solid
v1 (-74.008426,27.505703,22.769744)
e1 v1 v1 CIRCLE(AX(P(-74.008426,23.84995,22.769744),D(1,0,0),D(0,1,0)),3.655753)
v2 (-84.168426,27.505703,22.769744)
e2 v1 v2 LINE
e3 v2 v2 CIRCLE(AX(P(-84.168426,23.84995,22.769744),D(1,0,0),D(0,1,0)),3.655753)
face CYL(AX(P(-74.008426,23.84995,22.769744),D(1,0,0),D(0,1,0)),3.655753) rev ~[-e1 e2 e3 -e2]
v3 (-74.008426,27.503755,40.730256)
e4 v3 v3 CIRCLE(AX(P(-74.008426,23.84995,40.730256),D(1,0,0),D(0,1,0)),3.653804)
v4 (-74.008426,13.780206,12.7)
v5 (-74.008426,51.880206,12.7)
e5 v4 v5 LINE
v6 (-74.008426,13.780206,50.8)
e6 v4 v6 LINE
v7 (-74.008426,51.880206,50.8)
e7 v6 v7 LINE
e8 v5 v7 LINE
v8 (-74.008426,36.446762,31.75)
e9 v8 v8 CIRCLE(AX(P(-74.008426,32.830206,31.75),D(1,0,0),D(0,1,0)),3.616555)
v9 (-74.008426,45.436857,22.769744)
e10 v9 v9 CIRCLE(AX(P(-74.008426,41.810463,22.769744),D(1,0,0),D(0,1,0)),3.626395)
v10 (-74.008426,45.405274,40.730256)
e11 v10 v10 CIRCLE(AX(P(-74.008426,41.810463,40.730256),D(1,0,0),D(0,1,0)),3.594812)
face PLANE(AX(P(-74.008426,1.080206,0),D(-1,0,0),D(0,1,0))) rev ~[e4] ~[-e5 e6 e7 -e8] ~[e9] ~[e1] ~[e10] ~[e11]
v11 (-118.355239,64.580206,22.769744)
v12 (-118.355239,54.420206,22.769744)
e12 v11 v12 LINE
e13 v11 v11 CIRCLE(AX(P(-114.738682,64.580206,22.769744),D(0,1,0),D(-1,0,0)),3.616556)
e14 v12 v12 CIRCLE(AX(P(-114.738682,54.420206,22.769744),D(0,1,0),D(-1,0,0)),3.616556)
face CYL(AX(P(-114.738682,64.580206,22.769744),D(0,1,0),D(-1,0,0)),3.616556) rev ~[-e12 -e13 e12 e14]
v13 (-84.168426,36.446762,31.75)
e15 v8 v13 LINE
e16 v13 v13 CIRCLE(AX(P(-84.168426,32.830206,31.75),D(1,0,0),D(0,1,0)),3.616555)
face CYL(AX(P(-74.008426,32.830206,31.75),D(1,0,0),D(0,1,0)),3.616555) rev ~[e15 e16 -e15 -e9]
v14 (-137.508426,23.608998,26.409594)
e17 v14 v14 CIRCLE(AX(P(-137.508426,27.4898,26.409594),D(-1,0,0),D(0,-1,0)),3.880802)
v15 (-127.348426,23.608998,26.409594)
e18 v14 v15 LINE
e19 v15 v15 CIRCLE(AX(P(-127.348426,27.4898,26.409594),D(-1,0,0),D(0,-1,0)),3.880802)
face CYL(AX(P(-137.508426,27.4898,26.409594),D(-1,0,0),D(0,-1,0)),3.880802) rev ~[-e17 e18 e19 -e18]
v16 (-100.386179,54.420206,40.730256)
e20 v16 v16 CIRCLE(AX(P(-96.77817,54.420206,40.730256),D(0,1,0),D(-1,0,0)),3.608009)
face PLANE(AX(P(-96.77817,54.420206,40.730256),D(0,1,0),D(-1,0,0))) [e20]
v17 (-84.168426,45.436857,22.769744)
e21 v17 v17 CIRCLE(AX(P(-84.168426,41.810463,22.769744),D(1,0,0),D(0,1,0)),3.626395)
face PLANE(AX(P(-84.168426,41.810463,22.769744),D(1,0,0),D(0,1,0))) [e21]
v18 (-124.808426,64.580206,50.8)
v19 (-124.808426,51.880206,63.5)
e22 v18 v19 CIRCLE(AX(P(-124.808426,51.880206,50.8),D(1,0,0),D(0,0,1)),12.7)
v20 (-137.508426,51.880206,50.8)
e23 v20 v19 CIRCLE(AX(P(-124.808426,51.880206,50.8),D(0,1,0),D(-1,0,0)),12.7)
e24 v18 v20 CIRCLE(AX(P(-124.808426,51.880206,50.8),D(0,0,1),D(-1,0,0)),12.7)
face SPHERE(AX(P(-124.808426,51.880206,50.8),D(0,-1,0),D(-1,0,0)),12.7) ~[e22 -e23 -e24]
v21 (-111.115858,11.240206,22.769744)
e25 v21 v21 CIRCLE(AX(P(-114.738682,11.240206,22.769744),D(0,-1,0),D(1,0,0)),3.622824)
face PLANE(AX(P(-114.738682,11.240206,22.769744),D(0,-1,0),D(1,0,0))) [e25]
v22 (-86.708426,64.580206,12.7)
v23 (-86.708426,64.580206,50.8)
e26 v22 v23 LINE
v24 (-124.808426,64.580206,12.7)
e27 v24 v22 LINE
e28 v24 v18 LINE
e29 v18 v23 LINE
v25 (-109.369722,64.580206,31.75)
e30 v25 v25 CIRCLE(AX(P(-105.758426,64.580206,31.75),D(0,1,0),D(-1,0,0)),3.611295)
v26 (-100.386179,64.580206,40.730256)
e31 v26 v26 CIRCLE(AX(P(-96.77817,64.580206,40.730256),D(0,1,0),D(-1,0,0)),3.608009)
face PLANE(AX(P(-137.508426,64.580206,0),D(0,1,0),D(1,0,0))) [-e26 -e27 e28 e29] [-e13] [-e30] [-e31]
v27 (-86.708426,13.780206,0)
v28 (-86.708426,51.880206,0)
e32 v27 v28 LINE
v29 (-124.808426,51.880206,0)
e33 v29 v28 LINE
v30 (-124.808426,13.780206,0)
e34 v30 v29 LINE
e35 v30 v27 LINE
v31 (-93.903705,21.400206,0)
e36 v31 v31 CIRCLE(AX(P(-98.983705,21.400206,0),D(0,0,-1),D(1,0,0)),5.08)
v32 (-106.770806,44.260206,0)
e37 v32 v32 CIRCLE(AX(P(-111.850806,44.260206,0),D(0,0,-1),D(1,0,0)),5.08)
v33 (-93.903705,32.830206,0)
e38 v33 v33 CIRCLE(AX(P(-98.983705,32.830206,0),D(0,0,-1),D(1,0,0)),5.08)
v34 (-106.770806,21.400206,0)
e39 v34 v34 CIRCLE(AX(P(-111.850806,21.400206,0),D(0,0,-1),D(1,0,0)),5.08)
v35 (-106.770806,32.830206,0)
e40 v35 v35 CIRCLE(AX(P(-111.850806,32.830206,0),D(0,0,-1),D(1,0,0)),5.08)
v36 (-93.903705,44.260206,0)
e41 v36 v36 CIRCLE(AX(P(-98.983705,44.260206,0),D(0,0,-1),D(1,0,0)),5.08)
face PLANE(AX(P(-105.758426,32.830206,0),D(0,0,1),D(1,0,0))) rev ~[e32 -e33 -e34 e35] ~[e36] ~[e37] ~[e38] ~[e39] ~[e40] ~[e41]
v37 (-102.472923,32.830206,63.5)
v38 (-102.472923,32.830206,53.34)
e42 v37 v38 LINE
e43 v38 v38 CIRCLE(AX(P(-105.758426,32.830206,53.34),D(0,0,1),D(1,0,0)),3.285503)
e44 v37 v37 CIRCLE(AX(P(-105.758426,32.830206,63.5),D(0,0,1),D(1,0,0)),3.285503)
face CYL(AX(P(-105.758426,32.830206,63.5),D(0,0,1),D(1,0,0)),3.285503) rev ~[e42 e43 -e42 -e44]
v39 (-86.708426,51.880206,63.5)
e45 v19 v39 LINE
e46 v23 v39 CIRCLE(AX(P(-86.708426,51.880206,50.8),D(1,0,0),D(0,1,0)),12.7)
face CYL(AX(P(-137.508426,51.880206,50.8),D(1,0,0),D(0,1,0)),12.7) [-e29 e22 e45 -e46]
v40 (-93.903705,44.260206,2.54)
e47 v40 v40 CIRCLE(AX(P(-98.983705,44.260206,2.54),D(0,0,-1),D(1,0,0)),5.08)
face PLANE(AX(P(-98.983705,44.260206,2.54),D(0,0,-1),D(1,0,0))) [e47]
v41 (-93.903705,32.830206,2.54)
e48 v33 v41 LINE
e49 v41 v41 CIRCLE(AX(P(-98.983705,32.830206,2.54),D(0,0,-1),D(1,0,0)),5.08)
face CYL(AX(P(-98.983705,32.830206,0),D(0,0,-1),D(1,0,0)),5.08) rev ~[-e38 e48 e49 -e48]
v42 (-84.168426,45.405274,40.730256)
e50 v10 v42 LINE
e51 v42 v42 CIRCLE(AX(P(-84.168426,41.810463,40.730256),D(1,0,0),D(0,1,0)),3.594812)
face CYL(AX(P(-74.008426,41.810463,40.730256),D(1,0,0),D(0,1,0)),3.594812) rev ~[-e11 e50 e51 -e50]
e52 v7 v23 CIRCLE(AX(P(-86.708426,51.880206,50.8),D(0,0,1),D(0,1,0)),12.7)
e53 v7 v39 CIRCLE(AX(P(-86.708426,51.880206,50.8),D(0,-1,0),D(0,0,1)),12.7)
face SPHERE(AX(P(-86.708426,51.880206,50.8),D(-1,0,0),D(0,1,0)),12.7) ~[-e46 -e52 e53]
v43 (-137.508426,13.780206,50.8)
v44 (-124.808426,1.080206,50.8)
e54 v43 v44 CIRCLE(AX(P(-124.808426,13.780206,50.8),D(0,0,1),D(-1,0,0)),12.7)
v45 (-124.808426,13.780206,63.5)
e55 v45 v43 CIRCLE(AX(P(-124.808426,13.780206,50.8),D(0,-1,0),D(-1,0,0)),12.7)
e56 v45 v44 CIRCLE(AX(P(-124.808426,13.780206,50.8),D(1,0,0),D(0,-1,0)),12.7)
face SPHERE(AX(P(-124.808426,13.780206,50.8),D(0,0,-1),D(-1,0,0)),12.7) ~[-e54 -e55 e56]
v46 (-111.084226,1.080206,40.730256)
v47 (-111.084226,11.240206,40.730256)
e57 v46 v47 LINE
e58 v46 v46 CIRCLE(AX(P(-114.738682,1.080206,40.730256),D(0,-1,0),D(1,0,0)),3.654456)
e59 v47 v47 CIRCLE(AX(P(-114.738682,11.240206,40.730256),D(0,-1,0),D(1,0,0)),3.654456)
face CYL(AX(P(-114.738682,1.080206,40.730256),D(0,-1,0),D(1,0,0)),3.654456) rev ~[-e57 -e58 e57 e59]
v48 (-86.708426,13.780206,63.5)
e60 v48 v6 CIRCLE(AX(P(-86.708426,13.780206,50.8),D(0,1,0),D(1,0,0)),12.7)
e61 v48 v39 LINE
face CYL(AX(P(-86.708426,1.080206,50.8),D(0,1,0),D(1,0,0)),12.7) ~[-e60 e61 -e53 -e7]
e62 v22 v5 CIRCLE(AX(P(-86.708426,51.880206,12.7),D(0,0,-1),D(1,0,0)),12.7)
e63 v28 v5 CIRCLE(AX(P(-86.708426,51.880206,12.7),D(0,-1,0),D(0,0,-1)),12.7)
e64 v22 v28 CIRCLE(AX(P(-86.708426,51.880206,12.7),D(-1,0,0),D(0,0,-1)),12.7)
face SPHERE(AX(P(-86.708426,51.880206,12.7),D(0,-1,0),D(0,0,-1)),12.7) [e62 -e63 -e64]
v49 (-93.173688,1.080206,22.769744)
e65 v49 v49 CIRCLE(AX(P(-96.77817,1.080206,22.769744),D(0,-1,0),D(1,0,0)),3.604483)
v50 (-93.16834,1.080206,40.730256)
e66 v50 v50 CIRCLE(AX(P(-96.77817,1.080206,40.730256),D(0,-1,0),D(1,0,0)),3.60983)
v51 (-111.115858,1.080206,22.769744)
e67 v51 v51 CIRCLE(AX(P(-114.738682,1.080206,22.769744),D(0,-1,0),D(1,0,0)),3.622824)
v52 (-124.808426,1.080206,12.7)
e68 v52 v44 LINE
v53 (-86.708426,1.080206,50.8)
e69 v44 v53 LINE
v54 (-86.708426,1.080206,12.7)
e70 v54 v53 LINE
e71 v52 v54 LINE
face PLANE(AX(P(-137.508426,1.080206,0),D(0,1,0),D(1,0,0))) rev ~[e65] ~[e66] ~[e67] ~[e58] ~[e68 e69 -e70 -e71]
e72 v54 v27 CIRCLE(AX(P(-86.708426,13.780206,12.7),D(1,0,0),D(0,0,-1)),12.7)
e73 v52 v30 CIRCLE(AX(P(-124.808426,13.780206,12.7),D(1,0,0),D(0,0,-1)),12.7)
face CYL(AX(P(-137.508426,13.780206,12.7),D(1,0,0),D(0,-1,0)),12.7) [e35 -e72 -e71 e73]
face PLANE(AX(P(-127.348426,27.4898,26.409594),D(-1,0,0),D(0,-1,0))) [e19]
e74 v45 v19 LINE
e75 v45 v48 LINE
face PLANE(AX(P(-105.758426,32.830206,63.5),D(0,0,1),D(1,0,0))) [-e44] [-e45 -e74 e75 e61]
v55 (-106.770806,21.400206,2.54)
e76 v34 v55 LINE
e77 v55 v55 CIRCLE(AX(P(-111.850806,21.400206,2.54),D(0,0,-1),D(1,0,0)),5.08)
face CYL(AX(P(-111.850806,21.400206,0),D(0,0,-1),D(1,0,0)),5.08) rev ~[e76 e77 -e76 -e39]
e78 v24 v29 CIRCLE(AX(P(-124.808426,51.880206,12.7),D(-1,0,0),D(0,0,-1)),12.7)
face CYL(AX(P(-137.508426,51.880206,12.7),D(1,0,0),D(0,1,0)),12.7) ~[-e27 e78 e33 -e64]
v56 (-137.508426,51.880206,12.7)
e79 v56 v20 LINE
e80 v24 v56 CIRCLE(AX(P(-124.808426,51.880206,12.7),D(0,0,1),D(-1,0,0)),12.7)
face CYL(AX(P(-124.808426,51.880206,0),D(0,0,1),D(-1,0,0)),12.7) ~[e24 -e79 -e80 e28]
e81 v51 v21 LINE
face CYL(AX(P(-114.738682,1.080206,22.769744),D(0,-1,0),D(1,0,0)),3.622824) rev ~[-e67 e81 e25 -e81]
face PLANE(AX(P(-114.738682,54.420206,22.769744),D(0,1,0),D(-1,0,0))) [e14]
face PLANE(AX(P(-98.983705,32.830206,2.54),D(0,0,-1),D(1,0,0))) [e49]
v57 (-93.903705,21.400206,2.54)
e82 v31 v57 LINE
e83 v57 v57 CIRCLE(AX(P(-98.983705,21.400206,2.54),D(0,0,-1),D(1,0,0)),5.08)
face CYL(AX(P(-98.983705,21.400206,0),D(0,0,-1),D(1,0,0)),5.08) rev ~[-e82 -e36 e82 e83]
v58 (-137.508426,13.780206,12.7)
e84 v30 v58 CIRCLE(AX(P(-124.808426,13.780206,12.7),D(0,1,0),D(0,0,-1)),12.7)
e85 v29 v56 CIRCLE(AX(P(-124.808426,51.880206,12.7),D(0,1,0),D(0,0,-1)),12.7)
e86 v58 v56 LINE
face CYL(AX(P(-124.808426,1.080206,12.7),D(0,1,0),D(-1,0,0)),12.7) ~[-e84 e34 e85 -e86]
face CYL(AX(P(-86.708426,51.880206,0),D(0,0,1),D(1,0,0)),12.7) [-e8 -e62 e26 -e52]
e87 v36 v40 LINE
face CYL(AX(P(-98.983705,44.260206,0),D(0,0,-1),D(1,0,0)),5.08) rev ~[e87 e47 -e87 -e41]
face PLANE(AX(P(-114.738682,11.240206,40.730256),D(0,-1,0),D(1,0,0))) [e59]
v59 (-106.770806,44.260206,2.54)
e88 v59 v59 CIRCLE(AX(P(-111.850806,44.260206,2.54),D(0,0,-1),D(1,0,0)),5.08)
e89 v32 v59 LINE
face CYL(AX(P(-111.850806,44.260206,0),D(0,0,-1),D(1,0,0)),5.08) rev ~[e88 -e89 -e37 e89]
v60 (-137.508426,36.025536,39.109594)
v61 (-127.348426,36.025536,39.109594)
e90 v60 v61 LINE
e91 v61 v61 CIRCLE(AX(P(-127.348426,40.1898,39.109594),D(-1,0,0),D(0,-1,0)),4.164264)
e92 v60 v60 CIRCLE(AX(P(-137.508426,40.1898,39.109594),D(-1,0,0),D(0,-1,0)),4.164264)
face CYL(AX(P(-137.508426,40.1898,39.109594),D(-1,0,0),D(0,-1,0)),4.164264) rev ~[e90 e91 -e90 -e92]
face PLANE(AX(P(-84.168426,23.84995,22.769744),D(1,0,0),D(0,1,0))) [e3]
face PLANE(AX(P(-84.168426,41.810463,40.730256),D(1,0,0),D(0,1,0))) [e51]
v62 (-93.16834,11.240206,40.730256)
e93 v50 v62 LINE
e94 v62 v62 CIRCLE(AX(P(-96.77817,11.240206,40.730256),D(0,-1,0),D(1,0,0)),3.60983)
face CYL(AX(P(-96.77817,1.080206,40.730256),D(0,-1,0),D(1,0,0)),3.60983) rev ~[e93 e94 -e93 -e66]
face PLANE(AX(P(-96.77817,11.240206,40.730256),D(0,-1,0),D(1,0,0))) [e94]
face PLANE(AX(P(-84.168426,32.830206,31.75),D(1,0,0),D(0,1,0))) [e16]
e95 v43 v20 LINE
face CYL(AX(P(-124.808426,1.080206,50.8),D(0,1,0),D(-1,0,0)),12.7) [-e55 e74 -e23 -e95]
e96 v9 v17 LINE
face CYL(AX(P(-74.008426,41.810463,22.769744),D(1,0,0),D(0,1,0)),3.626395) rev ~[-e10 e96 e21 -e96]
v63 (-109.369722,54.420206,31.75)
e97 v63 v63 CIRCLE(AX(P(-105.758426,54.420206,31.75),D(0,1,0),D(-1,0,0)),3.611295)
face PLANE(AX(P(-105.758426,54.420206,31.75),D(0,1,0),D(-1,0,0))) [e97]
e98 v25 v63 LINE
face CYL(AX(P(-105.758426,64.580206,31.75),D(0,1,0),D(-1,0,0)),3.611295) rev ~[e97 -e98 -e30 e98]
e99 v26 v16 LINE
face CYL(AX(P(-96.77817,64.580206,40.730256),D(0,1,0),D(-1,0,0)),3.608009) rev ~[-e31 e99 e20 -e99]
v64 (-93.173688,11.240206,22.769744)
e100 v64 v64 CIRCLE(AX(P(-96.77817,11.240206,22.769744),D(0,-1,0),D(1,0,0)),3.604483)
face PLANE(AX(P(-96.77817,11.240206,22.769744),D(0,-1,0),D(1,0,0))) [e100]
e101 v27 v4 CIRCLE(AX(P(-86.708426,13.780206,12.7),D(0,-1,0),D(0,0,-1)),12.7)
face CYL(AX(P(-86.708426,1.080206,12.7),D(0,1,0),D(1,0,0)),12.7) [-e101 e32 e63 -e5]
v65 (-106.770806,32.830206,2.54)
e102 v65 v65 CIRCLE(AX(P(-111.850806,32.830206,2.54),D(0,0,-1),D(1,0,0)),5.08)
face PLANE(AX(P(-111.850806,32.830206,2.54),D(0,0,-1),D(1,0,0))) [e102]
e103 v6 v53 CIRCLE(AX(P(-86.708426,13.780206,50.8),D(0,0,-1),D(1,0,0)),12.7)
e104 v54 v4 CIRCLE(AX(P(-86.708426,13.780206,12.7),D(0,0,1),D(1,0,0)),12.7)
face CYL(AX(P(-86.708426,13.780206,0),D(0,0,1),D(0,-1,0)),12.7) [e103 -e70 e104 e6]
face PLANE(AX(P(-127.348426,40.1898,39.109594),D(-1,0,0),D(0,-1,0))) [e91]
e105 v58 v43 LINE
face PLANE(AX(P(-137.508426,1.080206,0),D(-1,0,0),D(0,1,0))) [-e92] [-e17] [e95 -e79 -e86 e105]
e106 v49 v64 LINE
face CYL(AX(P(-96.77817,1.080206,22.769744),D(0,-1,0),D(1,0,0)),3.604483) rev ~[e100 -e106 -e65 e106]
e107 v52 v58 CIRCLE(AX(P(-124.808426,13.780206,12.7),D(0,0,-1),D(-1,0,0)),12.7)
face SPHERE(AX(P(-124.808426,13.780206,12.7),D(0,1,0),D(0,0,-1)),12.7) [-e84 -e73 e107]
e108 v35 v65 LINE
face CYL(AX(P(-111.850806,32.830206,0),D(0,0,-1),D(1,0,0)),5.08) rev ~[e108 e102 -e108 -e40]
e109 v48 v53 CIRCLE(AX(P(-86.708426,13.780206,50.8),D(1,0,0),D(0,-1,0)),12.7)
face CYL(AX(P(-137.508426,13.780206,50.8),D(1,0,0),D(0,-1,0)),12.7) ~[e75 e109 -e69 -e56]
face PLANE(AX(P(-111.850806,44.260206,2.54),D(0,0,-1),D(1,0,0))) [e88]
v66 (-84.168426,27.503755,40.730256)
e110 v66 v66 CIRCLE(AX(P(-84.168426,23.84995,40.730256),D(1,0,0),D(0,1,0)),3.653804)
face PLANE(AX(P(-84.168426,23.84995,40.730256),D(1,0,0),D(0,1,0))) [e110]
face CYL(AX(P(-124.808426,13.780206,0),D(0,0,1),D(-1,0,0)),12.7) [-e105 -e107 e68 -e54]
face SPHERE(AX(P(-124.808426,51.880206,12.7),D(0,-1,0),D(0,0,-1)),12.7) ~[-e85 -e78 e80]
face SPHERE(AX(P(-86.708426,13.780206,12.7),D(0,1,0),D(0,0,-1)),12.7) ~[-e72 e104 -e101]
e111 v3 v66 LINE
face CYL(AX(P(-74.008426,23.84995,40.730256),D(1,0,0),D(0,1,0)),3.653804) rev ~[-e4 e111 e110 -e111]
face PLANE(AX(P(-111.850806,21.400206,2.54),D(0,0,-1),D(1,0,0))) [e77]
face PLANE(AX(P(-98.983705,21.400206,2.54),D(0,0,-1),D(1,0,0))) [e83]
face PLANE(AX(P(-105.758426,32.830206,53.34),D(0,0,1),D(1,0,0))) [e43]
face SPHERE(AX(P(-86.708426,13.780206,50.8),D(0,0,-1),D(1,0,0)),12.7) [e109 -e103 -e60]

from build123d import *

# Parameters (mm, degrees)
F0_W      = 63.5
F0_H      = 63.5
F1_DEPTH  = 63.5
F2_R      = 12.7
F3_R      = 3.2855032165
F4_DEPTH  = 10.16
F5_R      = 5.08
F6_DEPTH  = 2.54
F7_R      = 4.1642644098
F7_R_2    = 3.880802303
F8_DEPTH  = 10.16
F9_R      = 3.6538042468
F9_R_2    = 3.616555367
F9_R_3    = 3.5948118785
F9_R_4    = 3.6557525946
F9_R_5    = 3.6263948518
F10_DEPTH = 10.16
F11_R     = 3.6080090175
F11_R_2   = 3.6165563664
F11_R_3   = 3.6112952818
F12_DEPTH = 10.16
F13_R     = 3.6544564118
F13_R_2   = 3.6098297146
F13_R_3   = 3.6228239361
F13_R_4   = 3.6044825881
F14_DEPTH = 10.16


# Not quite as in the source:
# - a feature names something its author has since deleted; it is built from what else it names


with BuildPart() as f1:
    # F0 (on Top) → F1 (new body)
    with BuildSketch(Plane.XY):
        with Locations((-105.7584263082, 32.8302064445)):
            Rectangle(F0_W, F0_H)
    extrude(amount=F1_DEPTH)

    # F2
    f2_edges = [f1.edges().sort_by_distance(p)[0] for p in [
        (-74.008426, 32.830206, 0),
        (-137.508426, 32.830206, 0),
        (-105.758426, 1.080206, 0),
        (-137.508426, 1.080206, 31.75),
        (-74.008426, 1.080206, 31.75),
        (-137.508426, 32.830206, 63.5),
        (-105.758426, 64.580206, 0),
        (-137.508426, 64.580206, 31.75),
        (-105.758426, 64.580206, 63.5),
        (-74.008426, 64.580206, 31.75),
        (-74.008426, 32.830206, 63.5),
        (-105.758426, 1.080206, 63.5),
    ]]
    fillet(f2_edges, radius=F2_R)

    # F3 (on face) → F4 (cut)
    with BuildSketch(Plane.XY.offset(63.5)):
        with Locations((-105.7584263082, 32.8302064445)):
            Circle(F3_R)
    extrude(amount=-F4_DEPTH, mode=Mode.SUBTRACT)

    # F5 (on face) → F6 (cut)
    with BuildSketch(Plane(origin=(0, 0, 0), x_dir=(1, 0, 0), z_dir=(0, 0, -1))):
        with Locations((-111.8508055806, -21.4002064445)):
            Circle(F5_R)
        with Locations((-98.9837050438, -21.4002064445)):
            Circle(F5_R)
        with Locations((-111.8508055806, -32.8302064445)):
            Circle(F5_R)
        with Locations((-98.9837050438, -32.8302064445)):
            Circle(F5_R)
        with Locations((-111.8508055806, -44.2602064445)):
            Circle(F5_R)
        with Locations((-98.9837050438, -44.2602064445)):
            Circle(F5_R)
    extrude(amount=-F6_DEPTH, mode=Mode.SUBTRACT)

    # F7 (on face) → F8 (cut)
    with BuildSketch(Plane(origin=(-137.5084263082, 0, 0), x_dir=(0, -1, 0), z_dir=(-1, 0, 0))):
        with Locations((-40.1898002429, 39.1095937984)):
            Circle(F7_R)
        with Locations((-27.4898002429, 26.4095937984)):
            Circle(F7_R_2)
    extrude(amount=-F8_DEPTH, mode=Mode.SUBTRACT)

    # F9 (on face) → F10 (cut)
    with BuildSketch(Plane.YZ.offset(-74.0084263082)):
        with Locations((23.8499503234, 40.7302561211)):
            Circle(F9_R)
        with Locations((32.8302064445, 31.75)):
            Circle(F9_R_2)
        with Locations((41.8104625656, 40.7302561211)):
            Circle(F9_R_3)
        with Locations((23.8499503234, 22.7697438789)):
            Circle(F9_R_4)
        with Locations((41.8104625656, 22.7697438789)):
            Circle(F9_R_5)
    extrude(amount=-F10_DEPTH, mode=Mode.SUBTRACT)

    # F11 (on face) → F12 (cut)
    with BuildSketch(Plane(origin=(0, 64.5802064445, 0), x_dir=(-1, 0, 0), z_dir=(0, 1, 0))):
        with Locations((96.7781701871, 40.7302561211)):
            Circle(F11_R)
        with Locations((114.7386824292, 22.7697438789)):
            Circle(F11_R_2)
        with Locations((105.7584263082, 31.75)):
            Circle(F11_R_3)
    extrude(amount=-F12_DEPTH, mode=Mode.SUBTRACT)

    # F13 (on face) → F14 (cut)
    with BuildSketch(Plane.XZ.offset(-1.0802064445)):
        with Locations((-114.7386824292, 40.7302561211)):
            Circle(F13_R)
        with Locations((-96.7781701871, 40.7302561211)):
            Circle(F13_R_2)
        with Locations((-114.7386824292, 22.7697438789)):
            Circle(F13_R_3)
        with Locations((-96.7781701871, 22.7697438789)):
            Circle(F13_R_4)
    extrude(amount=-F14_DEPTH, mode=Mode.SUBTRACT)


solid = f1.part
